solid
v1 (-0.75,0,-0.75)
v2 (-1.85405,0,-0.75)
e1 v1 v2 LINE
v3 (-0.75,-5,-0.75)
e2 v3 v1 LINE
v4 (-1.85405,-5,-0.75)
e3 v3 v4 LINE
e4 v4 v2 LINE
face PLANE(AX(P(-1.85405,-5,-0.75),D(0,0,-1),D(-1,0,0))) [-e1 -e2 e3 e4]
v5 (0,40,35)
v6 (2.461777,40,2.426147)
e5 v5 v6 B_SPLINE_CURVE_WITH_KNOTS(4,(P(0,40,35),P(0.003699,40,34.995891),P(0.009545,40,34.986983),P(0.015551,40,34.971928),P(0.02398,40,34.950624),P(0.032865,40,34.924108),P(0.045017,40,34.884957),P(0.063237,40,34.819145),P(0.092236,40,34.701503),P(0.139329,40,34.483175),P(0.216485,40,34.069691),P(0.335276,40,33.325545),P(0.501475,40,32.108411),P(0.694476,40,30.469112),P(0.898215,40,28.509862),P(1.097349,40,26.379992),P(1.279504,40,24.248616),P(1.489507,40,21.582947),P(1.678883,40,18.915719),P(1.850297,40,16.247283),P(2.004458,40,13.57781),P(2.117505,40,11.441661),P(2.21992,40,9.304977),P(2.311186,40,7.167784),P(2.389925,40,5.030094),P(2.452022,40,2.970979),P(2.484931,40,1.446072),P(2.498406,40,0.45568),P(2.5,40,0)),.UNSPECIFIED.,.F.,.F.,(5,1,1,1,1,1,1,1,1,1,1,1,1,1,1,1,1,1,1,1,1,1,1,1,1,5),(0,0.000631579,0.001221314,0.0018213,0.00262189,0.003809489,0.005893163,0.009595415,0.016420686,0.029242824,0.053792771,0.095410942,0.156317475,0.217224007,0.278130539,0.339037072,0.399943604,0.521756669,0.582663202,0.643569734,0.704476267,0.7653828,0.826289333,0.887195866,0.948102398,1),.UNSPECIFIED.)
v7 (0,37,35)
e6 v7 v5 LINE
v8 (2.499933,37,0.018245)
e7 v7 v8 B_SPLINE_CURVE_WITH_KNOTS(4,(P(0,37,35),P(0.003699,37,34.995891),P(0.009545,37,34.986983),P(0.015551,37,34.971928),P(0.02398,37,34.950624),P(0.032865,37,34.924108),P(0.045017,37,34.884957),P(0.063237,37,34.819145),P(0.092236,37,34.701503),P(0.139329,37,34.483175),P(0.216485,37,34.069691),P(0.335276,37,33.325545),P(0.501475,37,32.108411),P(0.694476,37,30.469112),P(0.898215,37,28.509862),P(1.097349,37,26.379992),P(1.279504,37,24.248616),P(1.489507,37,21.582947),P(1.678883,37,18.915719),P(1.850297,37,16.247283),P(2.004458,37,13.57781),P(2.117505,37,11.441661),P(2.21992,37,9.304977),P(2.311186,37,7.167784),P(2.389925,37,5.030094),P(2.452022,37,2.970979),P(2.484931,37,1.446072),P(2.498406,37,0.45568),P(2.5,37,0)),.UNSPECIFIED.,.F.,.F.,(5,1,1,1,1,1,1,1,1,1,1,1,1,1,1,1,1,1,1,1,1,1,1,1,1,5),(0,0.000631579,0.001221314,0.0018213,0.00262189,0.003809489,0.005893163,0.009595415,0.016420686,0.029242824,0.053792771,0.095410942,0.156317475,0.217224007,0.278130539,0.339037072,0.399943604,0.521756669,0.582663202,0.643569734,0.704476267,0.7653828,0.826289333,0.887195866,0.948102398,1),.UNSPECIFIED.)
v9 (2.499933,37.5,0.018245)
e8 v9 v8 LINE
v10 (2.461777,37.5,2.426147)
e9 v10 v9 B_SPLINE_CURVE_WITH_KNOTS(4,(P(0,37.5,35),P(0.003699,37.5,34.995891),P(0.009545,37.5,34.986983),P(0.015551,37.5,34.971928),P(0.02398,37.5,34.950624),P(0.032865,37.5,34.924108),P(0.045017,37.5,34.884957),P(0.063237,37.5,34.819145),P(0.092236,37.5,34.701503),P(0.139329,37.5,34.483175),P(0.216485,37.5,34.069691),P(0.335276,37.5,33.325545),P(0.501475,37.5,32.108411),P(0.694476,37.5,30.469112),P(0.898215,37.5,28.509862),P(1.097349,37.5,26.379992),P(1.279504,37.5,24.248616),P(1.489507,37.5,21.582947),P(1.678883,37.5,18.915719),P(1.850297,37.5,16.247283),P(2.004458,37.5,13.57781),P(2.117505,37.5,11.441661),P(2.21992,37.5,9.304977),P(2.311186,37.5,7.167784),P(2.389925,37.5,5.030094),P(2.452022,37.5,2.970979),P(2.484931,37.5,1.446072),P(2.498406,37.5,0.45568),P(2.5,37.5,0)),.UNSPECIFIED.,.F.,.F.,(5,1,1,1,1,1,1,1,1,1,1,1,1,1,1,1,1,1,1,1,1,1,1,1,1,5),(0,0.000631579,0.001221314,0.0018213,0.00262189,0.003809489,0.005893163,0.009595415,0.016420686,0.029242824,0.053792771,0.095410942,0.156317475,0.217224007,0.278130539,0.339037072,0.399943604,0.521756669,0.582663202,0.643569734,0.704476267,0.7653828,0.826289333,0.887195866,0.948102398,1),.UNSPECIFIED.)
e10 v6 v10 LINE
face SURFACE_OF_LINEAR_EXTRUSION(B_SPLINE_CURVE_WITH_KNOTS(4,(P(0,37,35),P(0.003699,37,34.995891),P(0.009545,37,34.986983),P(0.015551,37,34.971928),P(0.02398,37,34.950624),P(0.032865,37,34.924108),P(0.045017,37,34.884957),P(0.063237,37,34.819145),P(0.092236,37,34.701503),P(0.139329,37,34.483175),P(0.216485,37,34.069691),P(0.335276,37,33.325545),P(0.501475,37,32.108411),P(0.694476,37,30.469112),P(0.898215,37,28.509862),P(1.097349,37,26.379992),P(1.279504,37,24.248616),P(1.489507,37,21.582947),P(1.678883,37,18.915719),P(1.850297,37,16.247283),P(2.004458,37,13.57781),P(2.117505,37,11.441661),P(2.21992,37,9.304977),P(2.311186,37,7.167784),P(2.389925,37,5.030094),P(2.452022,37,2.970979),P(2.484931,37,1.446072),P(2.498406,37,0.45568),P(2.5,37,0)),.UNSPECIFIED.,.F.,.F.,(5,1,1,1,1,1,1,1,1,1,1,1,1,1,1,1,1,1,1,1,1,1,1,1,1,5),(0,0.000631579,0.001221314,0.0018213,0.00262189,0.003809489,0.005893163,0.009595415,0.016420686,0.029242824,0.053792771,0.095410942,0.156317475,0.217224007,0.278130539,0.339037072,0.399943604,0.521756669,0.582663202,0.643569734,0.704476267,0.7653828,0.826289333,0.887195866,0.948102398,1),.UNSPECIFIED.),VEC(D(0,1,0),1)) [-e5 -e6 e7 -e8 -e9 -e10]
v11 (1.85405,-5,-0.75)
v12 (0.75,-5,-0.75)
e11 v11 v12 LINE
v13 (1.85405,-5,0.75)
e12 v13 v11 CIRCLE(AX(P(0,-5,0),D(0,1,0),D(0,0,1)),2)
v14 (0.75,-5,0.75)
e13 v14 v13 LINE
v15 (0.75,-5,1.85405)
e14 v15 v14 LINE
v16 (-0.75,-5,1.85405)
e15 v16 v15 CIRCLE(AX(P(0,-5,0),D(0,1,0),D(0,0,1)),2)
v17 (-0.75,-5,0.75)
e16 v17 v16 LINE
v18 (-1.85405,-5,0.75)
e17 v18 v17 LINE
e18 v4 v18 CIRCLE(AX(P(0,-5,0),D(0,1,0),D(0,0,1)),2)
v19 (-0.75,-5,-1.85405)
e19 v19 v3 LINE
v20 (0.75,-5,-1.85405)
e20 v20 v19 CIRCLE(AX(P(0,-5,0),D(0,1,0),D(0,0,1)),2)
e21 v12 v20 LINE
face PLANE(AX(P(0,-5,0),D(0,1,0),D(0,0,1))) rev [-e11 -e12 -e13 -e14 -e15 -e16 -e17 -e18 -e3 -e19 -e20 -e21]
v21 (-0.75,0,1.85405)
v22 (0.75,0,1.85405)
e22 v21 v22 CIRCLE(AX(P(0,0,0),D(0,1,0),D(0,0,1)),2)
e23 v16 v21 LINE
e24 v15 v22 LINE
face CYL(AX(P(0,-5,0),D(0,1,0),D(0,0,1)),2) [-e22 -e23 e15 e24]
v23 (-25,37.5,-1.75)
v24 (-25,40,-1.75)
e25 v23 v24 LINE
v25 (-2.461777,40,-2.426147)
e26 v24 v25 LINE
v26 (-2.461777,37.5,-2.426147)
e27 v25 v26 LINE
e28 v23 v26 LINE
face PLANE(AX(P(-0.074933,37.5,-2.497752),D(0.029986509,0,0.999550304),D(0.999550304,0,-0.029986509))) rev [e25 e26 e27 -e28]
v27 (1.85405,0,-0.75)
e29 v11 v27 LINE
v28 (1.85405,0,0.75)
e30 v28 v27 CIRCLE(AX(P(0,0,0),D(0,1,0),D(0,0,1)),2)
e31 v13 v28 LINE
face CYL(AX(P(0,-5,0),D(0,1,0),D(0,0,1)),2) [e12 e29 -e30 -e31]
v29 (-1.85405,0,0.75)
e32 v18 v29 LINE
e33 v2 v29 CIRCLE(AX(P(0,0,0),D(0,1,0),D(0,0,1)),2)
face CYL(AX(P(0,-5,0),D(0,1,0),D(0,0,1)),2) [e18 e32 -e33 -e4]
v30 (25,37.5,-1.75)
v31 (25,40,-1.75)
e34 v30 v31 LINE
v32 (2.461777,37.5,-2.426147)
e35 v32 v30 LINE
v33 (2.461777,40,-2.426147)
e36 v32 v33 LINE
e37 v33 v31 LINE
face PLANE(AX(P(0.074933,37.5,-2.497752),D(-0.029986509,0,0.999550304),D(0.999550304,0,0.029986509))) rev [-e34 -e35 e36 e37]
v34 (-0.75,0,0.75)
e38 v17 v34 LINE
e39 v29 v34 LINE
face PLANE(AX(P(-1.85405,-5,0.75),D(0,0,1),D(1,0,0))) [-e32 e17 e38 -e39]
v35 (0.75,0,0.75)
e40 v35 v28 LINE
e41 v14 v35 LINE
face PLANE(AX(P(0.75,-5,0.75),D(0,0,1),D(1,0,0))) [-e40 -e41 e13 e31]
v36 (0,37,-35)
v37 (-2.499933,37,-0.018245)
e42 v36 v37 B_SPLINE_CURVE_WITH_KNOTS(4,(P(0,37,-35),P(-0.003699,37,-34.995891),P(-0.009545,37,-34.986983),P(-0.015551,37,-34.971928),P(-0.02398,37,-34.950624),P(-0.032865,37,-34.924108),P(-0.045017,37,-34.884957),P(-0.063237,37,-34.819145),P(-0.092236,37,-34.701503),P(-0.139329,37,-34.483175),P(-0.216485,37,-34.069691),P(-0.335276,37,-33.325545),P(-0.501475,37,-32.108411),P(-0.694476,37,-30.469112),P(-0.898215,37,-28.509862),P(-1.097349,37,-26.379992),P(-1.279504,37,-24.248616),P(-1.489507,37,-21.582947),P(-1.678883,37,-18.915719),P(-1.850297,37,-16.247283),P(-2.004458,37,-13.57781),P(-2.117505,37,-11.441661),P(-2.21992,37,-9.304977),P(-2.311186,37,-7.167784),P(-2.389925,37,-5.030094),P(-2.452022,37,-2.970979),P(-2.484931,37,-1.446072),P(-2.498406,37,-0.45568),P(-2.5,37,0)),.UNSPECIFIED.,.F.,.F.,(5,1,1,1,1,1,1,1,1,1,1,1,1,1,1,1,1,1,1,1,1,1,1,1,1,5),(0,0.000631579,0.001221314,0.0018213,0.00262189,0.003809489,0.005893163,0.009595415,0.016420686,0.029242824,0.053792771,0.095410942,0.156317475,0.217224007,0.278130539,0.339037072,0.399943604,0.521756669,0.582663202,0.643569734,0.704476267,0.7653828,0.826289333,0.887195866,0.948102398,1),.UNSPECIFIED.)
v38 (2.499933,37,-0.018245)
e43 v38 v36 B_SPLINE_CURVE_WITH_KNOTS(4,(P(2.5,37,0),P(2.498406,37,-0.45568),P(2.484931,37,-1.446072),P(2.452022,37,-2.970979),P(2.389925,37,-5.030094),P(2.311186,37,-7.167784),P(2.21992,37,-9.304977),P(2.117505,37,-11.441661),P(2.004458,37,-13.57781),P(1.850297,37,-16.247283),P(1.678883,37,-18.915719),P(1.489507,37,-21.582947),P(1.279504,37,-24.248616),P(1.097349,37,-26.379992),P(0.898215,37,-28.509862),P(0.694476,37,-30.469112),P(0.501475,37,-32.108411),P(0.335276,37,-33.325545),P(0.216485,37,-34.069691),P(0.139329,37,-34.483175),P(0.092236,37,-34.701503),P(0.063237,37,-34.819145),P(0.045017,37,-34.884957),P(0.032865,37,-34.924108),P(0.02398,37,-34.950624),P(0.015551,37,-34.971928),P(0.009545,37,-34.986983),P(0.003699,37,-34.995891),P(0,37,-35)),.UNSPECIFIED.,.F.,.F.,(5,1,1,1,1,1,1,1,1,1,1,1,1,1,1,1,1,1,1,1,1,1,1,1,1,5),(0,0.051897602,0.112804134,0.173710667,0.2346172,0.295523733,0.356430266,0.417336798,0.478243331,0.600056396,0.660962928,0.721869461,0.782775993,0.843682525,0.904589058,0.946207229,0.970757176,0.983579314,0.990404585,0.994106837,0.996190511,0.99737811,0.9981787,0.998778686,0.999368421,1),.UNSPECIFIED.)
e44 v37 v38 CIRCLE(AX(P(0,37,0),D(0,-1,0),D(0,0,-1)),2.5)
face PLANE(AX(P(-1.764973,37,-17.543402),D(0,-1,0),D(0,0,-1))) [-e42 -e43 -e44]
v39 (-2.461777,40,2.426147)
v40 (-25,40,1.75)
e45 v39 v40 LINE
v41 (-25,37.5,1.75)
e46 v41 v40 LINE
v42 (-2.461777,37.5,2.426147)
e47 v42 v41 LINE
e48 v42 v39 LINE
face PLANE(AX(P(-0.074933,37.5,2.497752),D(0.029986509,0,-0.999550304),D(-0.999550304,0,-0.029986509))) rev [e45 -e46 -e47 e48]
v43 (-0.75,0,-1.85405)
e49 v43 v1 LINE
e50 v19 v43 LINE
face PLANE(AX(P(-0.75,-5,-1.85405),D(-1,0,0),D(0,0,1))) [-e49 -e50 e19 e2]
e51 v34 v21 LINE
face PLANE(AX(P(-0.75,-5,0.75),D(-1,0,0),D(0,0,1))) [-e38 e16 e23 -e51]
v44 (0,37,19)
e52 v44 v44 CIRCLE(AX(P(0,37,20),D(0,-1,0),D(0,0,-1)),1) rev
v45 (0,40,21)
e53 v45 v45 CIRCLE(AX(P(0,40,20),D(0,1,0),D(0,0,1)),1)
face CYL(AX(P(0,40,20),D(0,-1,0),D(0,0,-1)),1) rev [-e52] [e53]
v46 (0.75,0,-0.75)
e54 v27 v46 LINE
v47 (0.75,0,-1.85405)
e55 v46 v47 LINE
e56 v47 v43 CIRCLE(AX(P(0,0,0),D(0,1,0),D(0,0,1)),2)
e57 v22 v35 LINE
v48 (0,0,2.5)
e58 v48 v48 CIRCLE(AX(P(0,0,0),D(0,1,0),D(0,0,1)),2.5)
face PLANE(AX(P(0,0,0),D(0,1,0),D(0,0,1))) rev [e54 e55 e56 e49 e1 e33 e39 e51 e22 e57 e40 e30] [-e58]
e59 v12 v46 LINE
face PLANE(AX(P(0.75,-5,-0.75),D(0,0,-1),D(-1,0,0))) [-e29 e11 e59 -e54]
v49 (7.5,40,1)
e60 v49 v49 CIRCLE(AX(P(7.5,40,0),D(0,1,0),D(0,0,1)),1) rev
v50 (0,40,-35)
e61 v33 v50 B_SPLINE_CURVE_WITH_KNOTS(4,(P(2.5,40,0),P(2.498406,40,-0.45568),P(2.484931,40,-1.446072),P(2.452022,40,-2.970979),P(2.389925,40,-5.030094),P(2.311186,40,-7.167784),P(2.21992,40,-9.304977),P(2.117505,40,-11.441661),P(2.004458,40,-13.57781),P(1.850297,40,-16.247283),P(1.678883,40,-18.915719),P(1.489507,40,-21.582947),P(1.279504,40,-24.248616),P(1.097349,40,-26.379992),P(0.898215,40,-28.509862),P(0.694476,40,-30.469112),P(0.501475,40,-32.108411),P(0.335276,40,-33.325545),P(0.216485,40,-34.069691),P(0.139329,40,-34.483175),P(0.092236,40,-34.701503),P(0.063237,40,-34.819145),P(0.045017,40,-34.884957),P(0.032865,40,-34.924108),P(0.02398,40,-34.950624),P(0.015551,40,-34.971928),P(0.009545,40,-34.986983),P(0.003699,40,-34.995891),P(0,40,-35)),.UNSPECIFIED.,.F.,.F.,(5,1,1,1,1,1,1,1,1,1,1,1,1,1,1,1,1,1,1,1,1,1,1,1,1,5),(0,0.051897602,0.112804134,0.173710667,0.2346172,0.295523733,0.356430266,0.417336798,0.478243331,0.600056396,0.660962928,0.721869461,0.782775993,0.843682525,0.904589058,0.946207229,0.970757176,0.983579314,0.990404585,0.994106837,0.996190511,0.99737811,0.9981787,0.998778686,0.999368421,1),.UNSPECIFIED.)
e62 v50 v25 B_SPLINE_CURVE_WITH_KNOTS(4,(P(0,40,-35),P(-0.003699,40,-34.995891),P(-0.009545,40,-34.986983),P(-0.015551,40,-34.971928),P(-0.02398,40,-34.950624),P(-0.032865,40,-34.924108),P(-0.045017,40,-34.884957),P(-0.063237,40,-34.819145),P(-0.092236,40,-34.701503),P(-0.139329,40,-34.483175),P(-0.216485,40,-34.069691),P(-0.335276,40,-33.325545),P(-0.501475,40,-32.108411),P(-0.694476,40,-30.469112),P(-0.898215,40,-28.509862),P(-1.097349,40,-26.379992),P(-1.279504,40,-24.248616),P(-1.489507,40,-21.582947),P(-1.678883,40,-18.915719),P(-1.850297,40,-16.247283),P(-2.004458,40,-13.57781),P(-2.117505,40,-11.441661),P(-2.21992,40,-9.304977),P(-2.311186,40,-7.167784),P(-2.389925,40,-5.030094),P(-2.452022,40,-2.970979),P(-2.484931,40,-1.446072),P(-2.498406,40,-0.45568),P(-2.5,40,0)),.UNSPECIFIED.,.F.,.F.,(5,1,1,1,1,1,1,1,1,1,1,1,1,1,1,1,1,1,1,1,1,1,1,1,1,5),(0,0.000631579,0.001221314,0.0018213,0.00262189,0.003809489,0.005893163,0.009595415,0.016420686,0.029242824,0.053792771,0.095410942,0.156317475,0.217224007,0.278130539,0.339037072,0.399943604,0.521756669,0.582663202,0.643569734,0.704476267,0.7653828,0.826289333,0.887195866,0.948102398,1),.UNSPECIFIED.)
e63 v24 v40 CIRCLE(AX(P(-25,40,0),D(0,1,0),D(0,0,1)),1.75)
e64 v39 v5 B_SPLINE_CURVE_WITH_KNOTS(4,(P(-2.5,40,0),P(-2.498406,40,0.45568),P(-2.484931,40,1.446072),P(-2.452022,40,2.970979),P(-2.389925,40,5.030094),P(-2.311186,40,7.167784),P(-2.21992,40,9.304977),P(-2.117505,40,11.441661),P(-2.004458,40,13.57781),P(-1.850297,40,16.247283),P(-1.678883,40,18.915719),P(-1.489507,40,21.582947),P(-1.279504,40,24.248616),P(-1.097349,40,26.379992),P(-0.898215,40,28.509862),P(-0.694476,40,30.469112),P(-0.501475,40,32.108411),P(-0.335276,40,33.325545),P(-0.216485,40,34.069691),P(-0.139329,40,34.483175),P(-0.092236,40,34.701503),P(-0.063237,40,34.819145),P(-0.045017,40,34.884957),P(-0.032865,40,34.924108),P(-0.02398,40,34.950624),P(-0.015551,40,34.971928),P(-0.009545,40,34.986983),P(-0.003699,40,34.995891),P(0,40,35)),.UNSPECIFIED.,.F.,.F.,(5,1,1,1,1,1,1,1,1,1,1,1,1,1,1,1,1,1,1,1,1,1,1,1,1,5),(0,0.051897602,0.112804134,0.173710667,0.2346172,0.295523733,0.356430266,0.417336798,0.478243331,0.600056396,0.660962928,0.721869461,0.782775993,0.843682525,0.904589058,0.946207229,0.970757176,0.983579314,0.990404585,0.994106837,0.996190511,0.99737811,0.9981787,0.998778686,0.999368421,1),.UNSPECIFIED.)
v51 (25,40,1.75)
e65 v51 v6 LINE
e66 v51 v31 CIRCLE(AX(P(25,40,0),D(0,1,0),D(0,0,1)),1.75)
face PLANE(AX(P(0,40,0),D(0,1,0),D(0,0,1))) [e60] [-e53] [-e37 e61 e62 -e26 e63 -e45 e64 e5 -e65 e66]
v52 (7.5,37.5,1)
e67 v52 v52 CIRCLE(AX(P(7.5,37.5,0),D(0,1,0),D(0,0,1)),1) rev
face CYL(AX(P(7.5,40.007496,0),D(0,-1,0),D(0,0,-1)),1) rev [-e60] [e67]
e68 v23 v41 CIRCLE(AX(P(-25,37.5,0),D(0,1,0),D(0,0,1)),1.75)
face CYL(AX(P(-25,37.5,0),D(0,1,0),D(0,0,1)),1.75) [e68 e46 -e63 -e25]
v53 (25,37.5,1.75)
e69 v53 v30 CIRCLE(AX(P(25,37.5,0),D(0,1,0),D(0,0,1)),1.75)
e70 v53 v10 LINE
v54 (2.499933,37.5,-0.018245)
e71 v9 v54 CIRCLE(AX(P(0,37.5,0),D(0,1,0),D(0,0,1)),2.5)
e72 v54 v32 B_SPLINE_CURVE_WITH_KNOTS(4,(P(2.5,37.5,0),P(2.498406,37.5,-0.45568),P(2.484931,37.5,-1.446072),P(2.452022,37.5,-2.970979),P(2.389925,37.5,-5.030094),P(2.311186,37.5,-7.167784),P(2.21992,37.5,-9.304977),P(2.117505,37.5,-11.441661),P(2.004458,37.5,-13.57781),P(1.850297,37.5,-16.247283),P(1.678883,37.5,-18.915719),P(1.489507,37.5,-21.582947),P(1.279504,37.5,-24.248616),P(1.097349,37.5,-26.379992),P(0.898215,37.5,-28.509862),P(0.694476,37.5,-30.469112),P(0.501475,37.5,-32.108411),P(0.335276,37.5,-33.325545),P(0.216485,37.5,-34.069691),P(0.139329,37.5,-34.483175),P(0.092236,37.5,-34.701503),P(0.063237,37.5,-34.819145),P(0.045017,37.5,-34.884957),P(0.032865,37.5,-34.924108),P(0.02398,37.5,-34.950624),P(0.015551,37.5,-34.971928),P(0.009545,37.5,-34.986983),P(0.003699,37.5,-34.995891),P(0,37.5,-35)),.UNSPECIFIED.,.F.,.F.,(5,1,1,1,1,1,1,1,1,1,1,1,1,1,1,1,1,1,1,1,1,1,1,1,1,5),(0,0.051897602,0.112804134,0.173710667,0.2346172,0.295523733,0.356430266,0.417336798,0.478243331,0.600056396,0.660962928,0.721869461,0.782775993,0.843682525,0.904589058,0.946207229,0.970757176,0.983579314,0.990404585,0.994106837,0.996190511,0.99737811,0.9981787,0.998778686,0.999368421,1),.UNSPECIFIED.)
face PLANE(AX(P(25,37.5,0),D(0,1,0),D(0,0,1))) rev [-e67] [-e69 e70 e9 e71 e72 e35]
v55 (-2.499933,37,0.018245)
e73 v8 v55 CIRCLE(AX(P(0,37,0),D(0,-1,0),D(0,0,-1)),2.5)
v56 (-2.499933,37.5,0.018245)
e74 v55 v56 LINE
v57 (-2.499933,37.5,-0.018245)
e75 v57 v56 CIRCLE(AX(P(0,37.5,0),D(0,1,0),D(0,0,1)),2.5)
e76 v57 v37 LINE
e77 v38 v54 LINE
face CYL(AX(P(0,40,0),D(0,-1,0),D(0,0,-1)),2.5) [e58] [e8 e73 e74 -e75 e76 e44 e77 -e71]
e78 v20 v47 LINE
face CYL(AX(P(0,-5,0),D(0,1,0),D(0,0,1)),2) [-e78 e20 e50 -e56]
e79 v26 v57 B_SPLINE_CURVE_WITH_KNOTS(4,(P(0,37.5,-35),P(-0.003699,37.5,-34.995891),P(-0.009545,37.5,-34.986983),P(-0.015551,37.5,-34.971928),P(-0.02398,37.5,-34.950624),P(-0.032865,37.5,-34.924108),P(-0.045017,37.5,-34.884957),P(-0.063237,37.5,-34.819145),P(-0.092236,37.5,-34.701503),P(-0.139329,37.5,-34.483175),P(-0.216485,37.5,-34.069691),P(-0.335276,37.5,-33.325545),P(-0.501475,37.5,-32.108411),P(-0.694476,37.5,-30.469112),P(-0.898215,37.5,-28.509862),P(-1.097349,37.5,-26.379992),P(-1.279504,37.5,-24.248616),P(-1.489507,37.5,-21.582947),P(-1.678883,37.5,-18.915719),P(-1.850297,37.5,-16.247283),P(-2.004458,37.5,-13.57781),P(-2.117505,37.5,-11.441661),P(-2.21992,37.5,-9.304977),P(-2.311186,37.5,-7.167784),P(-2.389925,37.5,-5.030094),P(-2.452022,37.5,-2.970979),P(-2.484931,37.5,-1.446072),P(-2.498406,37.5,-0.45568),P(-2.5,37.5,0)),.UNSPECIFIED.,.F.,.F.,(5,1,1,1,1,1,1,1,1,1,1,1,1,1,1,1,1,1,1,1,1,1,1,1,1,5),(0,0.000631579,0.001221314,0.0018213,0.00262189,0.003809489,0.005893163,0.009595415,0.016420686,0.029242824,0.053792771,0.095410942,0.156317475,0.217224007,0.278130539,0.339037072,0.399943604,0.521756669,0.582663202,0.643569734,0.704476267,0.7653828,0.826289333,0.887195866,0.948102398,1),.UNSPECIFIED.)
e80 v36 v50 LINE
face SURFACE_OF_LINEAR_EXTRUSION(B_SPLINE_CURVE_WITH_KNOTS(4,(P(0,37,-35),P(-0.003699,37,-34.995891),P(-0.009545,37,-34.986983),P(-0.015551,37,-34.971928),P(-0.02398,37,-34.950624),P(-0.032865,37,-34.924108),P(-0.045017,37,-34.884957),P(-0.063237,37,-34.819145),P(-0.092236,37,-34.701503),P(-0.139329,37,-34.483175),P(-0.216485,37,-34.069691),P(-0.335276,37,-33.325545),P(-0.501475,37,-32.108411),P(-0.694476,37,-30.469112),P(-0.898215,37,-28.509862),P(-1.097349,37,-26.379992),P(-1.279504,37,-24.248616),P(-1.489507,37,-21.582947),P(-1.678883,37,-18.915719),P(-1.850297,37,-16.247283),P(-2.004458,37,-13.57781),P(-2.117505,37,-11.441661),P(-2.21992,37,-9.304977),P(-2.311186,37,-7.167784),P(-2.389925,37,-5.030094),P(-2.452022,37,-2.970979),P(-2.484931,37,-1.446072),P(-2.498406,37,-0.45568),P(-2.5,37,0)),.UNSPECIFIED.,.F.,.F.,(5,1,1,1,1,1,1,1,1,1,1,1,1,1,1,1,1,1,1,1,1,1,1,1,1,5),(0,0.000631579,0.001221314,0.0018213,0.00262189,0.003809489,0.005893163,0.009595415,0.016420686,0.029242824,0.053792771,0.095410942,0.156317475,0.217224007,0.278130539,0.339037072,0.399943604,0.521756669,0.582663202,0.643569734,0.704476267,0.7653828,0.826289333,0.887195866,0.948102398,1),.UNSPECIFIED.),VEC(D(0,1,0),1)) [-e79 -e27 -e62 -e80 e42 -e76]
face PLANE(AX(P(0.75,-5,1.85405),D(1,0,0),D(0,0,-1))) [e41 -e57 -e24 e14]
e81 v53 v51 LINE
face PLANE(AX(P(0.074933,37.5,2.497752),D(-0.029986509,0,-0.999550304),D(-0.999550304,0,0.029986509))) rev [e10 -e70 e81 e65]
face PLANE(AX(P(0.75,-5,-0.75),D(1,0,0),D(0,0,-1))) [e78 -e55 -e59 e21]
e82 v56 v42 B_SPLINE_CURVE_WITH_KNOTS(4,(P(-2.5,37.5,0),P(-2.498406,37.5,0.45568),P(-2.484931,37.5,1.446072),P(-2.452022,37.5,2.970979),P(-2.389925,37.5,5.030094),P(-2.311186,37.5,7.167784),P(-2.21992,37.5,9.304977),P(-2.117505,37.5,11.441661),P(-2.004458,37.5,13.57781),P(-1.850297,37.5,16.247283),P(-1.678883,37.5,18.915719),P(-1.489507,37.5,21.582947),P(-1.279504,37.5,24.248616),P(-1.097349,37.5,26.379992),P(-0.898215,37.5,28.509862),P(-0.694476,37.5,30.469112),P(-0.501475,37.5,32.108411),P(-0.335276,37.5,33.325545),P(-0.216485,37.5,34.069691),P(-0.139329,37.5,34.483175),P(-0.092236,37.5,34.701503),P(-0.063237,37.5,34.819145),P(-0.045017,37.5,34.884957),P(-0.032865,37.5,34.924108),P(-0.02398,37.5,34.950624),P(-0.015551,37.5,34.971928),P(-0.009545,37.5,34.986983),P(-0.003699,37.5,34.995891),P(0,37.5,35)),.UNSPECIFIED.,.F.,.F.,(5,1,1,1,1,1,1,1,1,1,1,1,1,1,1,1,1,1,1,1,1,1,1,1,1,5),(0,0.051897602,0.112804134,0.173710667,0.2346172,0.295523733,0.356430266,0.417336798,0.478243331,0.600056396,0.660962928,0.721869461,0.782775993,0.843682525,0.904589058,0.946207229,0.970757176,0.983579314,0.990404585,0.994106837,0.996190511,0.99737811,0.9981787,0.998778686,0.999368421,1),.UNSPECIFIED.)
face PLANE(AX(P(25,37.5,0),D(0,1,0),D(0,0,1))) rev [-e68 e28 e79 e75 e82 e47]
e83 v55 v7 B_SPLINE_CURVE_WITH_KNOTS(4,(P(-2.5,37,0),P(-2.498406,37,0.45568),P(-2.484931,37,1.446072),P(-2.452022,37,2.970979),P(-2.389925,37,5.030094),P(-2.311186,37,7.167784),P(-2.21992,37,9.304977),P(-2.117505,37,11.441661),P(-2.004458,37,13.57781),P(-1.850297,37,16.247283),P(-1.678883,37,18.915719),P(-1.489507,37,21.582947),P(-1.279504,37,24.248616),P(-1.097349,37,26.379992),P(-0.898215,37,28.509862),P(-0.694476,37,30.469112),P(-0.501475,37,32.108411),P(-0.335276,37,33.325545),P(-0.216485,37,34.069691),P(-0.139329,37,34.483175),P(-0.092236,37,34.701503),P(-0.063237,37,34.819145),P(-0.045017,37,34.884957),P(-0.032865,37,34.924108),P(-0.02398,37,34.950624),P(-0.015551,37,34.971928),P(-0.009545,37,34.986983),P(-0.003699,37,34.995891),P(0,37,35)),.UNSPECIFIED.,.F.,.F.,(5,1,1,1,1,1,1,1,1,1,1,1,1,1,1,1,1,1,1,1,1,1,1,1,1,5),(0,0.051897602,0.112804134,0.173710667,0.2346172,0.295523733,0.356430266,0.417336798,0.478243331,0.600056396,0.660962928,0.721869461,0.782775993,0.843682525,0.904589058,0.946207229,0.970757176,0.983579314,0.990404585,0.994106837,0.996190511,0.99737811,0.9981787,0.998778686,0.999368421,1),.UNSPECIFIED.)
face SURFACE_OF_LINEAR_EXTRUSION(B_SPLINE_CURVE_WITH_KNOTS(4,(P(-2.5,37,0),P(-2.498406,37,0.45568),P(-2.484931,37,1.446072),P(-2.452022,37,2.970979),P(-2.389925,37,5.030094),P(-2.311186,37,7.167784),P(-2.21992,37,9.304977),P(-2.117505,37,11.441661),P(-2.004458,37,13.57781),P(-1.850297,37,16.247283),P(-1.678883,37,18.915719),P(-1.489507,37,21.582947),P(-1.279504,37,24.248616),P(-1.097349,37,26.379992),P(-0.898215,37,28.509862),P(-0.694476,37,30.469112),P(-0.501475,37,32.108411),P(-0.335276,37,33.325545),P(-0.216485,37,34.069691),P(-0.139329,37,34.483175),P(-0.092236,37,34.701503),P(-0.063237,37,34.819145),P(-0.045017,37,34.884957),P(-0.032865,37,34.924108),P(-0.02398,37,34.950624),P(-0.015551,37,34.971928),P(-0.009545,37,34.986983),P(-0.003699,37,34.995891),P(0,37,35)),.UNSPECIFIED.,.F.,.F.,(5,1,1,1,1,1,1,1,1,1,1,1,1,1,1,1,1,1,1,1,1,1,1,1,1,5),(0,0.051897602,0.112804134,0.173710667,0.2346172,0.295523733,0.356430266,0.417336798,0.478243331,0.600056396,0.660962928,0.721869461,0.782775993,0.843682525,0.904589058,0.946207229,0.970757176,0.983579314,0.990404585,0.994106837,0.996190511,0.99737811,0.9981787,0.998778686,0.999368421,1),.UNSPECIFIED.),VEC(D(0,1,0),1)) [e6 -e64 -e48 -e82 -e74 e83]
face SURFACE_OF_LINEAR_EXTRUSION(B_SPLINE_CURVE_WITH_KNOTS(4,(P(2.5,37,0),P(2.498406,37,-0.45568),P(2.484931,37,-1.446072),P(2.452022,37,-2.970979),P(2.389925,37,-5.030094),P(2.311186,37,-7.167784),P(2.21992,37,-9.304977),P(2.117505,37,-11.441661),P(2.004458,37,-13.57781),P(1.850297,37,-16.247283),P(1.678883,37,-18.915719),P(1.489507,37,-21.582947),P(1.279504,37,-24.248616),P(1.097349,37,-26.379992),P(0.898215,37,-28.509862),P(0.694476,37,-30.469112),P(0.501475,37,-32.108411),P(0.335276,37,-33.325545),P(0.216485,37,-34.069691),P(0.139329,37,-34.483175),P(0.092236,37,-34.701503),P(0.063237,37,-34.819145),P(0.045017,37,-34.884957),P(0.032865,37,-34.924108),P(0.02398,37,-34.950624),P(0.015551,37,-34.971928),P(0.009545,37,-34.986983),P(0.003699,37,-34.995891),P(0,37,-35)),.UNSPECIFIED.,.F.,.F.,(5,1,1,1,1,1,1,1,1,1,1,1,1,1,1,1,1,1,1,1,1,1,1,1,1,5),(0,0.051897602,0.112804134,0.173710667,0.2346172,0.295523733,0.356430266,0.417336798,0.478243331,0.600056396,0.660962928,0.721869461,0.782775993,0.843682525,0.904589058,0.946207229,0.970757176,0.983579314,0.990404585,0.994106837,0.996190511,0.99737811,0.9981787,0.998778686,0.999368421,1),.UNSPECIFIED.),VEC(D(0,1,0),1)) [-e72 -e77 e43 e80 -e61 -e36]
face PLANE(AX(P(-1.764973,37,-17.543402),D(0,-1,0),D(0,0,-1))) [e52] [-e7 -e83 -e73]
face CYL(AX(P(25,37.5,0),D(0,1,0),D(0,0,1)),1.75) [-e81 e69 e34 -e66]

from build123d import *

# Parameters (mm, degrees)
SKETCH_1_R          = 2.5
EXTRUDE_1_DEPTH     = 40
EXTRUDE_2_DEPTH     = 5
EXTRUDE_START       = 40
EXTRUDE_3_DEPTH     = 2.5
SKETCH_4_R          = 1
CUT_EXTRUDE_1_DEPTH = 49.185189633
EXTRUDE_START_2     = 37
EXTRUDE_5_DEPTH     = 3
SKETCH_6_R          = 1
CUT_EXTRUDE_2_DEPTH = 60.502626163


# Read off the part's stored shape, not the designer's step: 凸台-拉伸5
with BuildPart() as part:
    # 草图1 → 凸台-拉伸1 (new body)
    with BuildSketch(Plane(origin=(0, 0, 0), x_dir=(1, 0, 0), z_dir=(0, 1, 0))):
        with Locations(Location((0, 0, 0), (0, 0, 270))):
            Circle(SKETCH_1_R)
    extrude(amount=EXTRUDE_1_DEPTH)

    # 草图2 → 凸台-拉伸2 (add)
    with BuildSketch(Plane(origin=(0, 0, 0), x_dir=(1, 0, 0), z_dir=(0, 1, 0))):
        with BuildLine():
            Line((-1.854049622, 0.75), (-0.75, 0.75))
            Line((-0.75, 0.75), (-0.75, 1.854049622))
            ThreePointArc((-0.75, 1.854049622), (0, 2), (0.75, 1.854049622))
            Line((0.75, 1.854049622), (0.75, 0.75))
            Line((0.75, 0.75), (1.854049622, 0.75))
            ThreePointArc((1.854049622, 0.75), (2, 0), (1.854049622, -0.75))
            Line((1.854049622, -0.75), (0.75, -0.75))
            Line((0.75, -0.75), (0.75, -1.854049622))
            ThreePointArc((0.75, -1.854049622), (0, -2), (-0.75, -1.854049622))
            Line((-0.75, -1.854049622), (-0.75, -0.75))
            Line((-0.75, -0.75), (-1.854049622, -0.75))
            ThreePointArc((-1.854049622, -0.75), (-2, 0), (-1.854049622, 0.75))
        make_face()
    extrude(amount=-EXTRUDE_2_DEPTH)

    # 草图3 → 凸台-拉伸3 (add)
    with BuildSketch(Plane(origin=(0, 0, 0), x_dir=(1, 0, 0), z_dir=(0, 1, 0)).offset(EXTRUDE_START)):
        with BuildLine():
            Line((-25, 1.75), (0, 2.5))
            Line((0, 2.5), (25, 1.75))
            ThreePointArc((25, 1.75), (26.75, 0), (25, -1.75))
            Line((25, -1.75), (0, -2.5))
            Line((0, -2.5), (-25, -1.75))
            ThreePointArc((-25, -1.75), (-26.75, 0), (-25, 1.75))
        make_face()
    extrude(amount=-EXTRUDE_3_DEPTH)

    # 草图4 → 切除-拉伸1 (cut, through all)
    with BuildSketch(Plane(origin=(0, 0, 0), x_dir=(1, 0, 0), z_dir=(0, 1, 0))):
        with Locations(Location((7.5, 0, 0), (0, 0, 270))):
            Circle(SKETCH_4_R)
    extrude(amount=CUT_EXTRUDE_1_DEPTH, mode=Mode.SUBTRACT)

    # 凸台-拉伸5 outline → 凸台-拉伸5 (add)
    with BuildSketch(Plane(origin=(0, 0, 0), x_dir=(1, 0, 0), z_dir=(0, 1, 0)).offset(EXTRUDE_START_2)):
        with BuildLine():
            add(Edge.make_bspline(
                [(2.499933423, 0.018245068), (2.498219386, 0.469363251), (2.484734316, 1.455192602), (2.451884064, 2.975538514), (2.389924718, 5.030093947), (2.311185682, 7.167783743), (2.21992006, 9.304977486), (2.117504763, 11.441661138), (2.004457826, 13.577810113), (1.850297461, 16.247283269), (1.678883113, 18.915719005), (1.489506552, 21.582946653), (1.279504124, 24.248615937), (1.097348525, 26.379992466), (0.89821468, 28.50986205), (0.694476446, 30.469111551), (0.501474971, 32.108411254), (0.335275975, 33.325545367), (0.216484884, 34.069691013), (0.139328591, 34.483174612), (0.092236202, 34.701503032), (0.063236689, 34.819144825), (0.045016629, 34.88495716), (0.032864766, 34.924107989), (0.023980122, 34.950624486), (0.015550639, 34.971928448), (0.009545374, 34.986982697), (0.003698819, 34.995890501), (0, 35)],
                knots=[0.000519485, 0.000519485, 0.000519485, 0.000519485, 0.000519485, 0.051897602, 0.112804134, 0.173710667, 0.2346172, 0.295523733, 0.356430266, 0.417336798, 0.478243331, 0.600056396, 0.660962928, 0.721869461, 0.782775993, 0.843682525, 0.904589058, 0.946207229, 0.970757176, 0.983579314, 0.990404585, 0.994106837, 0.996190511, 0.99737811, 0.9981787, 0.998778686, 0.999368421, 1, 1, 1, 1, 1], degree=4))
            add(Edge.make_bspline(
                [(0, 35), (-0.003698819, 34.995890501), (-0.009545374, 34.986982697), (-0.015550639, 34.971928448), (-0.023980122, 34.950624486), (-0.032864766, 34.924107989), (-0.045016629, 34.88495716), (-0.063236689, 34.819144825), (-0.092236202, 34.701503032), (-0.139328591, 34.483174612), (-0.216484884, 34.069691013), (-0.335275975, 33.325545367), (-0.501474971, 32.108411254), (-0.694476446, 30.469111551), (-0.89821468, 28.50986205), (-1.097348525, 26.379992466), (-1.279504125, 24.248615937), (-1.489506552, 21.582946653), (-1.678883113, 18.915719005), (-1.850297461, 16.247283269), (-2.004457826, 13.577810113), (-2.117504763, 11.441661138), (-2.21992006, 9.304977486), (-2.311185682, 7.167783743), (-2.389924718, 5.030093947), (-2.451884064, 2.975538513), (-2.484734316, 1.455192601), (-2.498219387, 0.46936325), (-2.499933423, 0.018245066)],
                knots=[0, 0, 0, 0, 0, 0.000631579, 0.001221314, 0.0018213, 0.00262189, 0.003809489, 0.005893163, 0.009595415, 0.016420686, 0.029242824, 0.053792771, 0.095410942, 0.156317475, 0.217224007, 0.278130539, 0.339037072, 0.399943604, 0.521756669, 0.582663202, 0.643569734, 0.704476267, 0.7653828, 0.826289333, 0.887195866, 0.948102398, 0.999480515, 0.999480515, 0.999480515, 0.999480515, 0.999480515], degree=4))
            ThreePointArc((-2.499933423, 0.018245066), (-1e-09, 2.5), (2.499933423, 0.018245068))
        make_face()
        with BuildLine():
            ThreePointArc((2.499933423, -0.018245068), (-1e-09, -2.5), (-2.499933423, -0.018245066))
            add(Edge.make_bspline(
                [(-2.499933423, -0.018245066), (-2.498219387, -0.46936325), (-2.484734316, -1.455192601), (-2.451884064, -2.975538513), (-2.389924718, -5.030093947), (-2.311185682, -7.167783743), (-2.21992006, -9.304977486), (-2.117504763, -11.441661138), (-2.004457826, -13.577810113), (-1.850297461, -16.247283269), (-1.678883113, -18.915719005), (-1.489506552, -21.582946653), (-1.279504125, -24.248615937), (-1.097348525, -26.379992466), (-0.89821468, -28.50986205), (-0.694476446, -30.469111551), (-0.501474971, -32.108411254), (-0.335275975, -33.325545367), (-0.216484884, -34.069691013), (-0.139328591, -34.483174612), (-0.092236202, -34.701503032), (-0.063236689, -34.819144825), (-0.045016629, -34.88495716), (-0.032864766, -34.924107989), (-0.023980122, -34.950624486), (-0.015550639, -34.971928448), (-0.009545374, -34.986982697), (-0.003698819, -34.995890501), (0, -35)],
                knots=[0.000519485, 0.000519485, 0.000519485, 0.000519485, 0.000519485, 0.051897602, 0.112804134, 0.173710667, 0.2346172, 0.295523733, 0.356430266, 0.417336798, 0.478243331, 0.600056396, 0.660962928, 0.721869461, 0.782775993, 0.843682525, 0.904589058, 0.946207229, 0.970757176, 0.983579314, 0.990404585, 0.994106837, 0.996190511, 0.99737811, 0.9981787, 0.998778686, 0.999368421, 1, 1, 1, 1, 1], degree=4))
            add(Edge.make_bspline(
                [(0, -35), (0.003698819, -34.995890501), (0.009545374, -34.986982697), (0.015550639, -34.971928448), (0.023980122, -34.950624486), (0.032864766, -34.924107989), (0.045016629, -34.88495716), (0.063236689, -34.819144825), (0.092236202, -34.701503032), (0.139328591, -34.483174612), (0.216484884, -34.069691013), (0.335275975, -33.325545367), (0.501474971, -32.108411254), (0.694476446, -30.469111551), (0.89821468, -28.50986205), (1.097348525, -26.379992466), (1.279504124, -24.248615937), (1.489506552, -21.582946653), (1.678883113, -18.915719005), (1.850297461, -16.247283269), (2.004457826, -13.577810113), (2.117504763, -11.441661138), (2.21992006, -9.304977486), (2.311185682, -7.167783743), (2.389924718, -5.030093947), (2.451884064, -2.975538514), (2.484734316, -1.455192602), (2.498219386, -0.469363251), (2.499933423, -0.018245068)],
                knots=[0, 0, 0, 0, 0, 0.000631579, 0.001221314, 0.0018213, 0.00262189, 0.003809489, 0.005893163, 0.009595415, 0.016420686, 0.029242824, 0.053792771, 0.095410942, 0.156317475, 0.217224007, 0.278130539, 0.339037072, 0.399943604, 0.521756669, 0.582663202, 0.643569734, 0.704476267, 0.7653828, 0.826289333, 0.887195866, 0.948102398, 0.999480515, 0.999480515, 0.999480515, 0.999480515, 0.999480515], degree=4))
        make_face()
    extrude(amount=EXTRUDE_5_DEPTH)

    # 草图6 → 切除-拉伸2 (cut, through all)
    with BuildSketch(Plane(origin=(0, 0, 0), x_dir=(1, 0, 0), z_dir=(0, 1, 0))):
        with Locations(Location((0, -20, 0), (0, 0, 90))):
            Circle(SKETCH_6_R)
    extrude(amount=CUT_EXTRUDE_2_DEPTH, mode=Mode.SUBTRACT)


solid = part.part
